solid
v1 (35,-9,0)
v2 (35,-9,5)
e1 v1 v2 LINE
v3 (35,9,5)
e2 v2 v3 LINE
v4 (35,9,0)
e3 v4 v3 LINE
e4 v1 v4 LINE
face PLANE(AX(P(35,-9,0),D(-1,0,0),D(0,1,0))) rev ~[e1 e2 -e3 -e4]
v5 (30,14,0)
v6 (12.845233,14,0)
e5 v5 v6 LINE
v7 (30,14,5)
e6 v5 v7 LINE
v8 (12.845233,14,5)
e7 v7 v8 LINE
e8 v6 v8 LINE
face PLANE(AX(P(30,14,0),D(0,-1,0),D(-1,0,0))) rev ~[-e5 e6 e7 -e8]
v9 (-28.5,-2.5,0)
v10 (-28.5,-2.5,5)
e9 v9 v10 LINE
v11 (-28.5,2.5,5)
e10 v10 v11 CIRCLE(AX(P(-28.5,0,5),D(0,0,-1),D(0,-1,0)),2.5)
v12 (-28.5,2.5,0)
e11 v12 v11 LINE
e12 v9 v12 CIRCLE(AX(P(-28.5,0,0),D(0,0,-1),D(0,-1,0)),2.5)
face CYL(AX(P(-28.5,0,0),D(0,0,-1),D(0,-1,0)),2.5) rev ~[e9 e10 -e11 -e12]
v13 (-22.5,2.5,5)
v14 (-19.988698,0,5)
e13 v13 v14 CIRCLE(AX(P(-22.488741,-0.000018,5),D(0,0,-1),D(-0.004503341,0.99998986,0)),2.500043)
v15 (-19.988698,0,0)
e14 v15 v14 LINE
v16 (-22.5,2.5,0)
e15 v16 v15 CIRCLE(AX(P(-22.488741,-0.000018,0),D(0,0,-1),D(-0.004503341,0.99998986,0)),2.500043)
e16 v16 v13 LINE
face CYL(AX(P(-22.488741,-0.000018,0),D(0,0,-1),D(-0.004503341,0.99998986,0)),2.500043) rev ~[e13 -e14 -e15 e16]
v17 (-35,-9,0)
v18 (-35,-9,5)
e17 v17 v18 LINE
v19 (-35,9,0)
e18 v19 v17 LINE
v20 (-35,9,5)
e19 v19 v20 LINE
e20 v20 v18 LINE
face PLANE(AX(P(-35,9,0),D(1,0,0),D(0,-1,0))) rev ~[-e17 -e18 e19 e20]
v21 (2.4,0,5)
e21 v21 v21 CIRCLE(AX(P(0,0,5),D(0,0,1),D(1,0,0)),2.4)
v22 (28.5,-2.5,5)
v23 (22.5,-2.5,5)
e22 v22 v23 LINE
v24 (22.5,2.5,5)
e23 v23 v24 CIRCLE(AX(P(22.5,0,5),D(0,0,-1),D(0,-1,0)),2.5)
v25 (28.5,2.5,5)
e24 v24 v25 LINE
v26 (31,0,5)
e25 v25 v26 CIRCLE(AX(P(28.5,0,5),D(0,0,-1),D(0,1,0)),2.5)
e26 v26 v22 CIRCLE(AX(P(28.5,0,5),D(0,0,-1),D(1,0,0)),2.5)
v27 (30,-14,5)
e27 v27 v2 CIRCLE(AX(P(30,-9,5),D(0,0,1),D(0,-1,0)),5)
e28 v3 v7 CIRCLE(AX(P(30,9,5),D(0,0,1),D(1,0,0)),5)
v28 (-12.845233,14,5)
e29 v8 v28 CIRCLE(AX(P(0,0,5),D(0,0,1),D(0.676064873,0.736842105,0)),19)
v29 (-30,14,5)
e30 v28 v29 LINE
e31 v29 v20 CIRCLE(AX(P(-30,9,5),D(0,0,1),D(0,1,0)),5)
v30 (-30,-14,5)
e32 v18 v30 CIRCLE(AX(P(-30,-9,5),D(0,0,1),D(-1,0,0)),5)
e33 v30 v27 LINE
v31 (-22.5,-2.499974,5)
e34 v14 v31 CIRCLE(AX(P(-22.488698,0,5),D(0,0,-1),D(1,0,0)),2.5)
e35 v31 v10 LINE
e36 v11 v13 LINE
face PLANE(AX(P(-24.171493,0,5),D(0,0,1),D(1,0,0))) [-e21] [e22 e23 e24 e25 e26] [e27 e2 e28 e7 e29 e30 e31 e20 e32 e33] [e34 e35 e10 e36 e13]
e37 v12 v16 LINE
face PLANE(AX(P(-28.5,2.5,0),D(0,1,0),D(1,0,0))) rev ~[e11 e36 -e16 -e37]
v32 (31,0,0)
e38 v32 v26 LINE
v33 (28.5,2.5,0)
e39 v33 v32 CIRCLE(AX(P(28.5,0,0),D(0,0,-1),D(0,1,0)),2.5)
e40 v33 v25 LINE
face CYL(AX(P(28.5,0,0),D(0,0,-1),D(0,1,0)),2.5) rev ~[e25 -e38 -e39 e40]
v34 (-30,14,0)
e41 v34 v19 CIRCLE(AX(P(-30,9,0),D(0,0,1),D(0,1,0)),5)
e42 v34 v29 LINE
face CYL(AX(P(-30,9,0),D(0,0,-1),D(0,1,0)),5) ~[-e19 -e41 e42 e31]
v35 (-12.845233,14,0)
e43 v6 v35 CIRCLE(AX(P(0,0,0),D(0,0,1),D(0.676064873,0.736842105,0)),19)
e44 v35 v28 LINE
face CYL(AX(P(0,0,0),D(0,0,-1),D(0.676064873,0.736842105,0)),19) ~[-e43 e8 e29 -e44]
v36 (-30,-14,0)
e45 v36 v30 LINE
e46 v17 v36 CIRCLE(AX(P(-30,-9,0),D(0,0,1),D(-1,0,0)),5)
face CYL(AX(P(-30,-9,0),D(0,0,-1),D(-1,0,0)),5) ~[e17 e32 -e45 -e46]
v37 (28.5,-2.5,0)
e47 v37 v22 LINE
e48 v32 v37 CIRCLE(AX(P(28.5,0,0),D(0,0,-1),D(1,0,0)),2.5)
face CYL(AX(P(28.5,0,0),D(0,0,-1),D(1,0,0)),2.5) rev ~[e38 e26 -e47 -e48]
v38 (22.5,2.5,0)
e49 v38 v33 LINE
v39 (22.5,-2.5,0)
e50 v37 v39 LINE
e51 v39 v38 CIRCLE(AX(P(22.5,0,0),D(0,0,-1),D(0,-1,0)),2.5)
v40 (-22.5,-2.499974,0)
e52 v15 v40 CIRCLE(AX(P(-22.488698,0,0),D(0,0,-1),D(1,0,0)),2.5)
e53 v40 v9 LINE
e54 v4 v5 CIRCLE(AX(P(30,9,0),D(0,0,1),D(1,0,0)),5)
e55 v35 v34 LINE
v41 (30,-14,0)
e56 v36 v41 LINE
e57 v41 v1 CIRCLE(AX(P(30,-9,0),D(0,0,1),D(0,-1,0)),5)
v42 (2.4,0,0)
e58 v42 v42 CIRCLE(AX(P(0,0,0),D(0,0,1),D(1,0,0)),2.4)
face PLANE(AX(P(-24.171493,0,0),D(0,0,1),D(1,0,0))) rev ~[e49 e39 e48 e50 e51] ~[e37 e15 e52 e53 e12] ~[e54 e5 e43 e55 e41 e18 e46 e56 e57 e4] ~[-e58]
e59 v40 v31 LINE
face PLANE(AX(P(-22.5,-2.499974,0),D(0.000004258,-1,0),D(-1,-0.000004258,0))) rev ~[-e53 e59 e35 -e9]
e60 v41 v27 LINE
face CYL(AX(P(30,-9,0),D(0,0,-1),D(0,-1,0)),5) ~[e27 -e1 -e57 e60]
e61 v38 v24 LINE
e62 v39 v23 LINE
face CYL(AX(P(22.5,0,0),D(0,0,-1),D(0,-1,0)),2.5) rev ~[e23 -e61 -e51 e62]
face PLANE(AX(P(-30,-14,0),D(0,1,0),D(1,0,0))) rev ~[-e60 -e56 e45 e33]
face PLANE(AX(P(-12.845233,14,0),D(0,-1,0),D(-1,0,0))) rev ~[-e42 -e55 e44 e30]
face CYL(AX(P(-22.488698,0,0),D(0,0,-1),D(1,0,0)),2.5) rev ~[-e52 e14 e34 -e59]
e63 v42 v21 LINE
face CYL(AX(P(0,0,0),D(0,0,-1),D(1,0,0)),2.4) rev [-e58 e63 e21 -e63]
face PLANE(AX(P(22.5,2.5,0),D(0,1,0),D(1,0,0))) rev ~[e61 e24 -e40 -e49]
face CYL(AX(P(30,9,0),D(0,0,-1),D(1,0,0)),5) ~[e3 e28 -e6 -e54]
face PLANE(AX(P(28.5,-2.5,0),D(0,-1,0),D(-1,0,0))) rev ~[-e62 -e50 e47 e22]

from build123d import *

# Parameters (mm, degrees)
F0_R     = 2.4
F0_W     = 18
F0_H     = 4
F1_DEPTH = 5


# Not quite as in the source:
# - ends of sketch curves that miss each other by under 0.0002 mm in the source are joined


with BuildPart() as f1:
    # F0 (on Top) → F1 (new body)
    with BuildSketch(Plane.XY):
        with BuildLine():
            Line((-12.8452325787, 14), (-30, 14))
            ThreePointArc((-30, 14), (-33.5355339059, 12.5355339059), (-35, 9))
            Line((-35, 9), (-35, -9))
            ThreePointArc((-35, -9), (-33.5355339059, -12.5355339059), (-30, -14))
            Line((-30, -14), (-12.8452325787, -14))
            ThreePointArc((-12.8452325787, -14), (-19, 0), (-12.8452325787, 14))
        make_face()
        with BuildLine():
            ThreePointArc((-28.5, -2.5), (-31, 0), (-28.5, 2.5))
            Line((-28.5, 2.5), (-22.5, 2.5))
            ThreePointArc((-22.5, 2.5), (-20.7249314431, 1.7717582393), (-19.9886980778, 0))
            ThreePointArc((-19.9886980778, 0), (-20.724931484, -1.77175828), (-22.5, -2.4999744532))
            Line((-22.5, -2.4999744532), (-28.5, -2.5))
        make_face(mode=Mode.SUBTRACT)
        with BuildLine():
            Line((12.8452325787, 14), (-12.8452325787, 14))
            ThreePointArc((-12.8452325787, 14), (-19, 0), (-12.8452325787, -14))
            add(Edge.make_bspline(
                [(-9, -10), (-10.2817441929, -11.3333333333), (-11.5634883858, -12.6666666667), (-12.8452325787, -14)],
                knots=[0, 0, 0, 0, 5.5484965156, 5.5484965156, 5.5484965156, 5.5484965156], degree=3))
            Line((-9, -10), (9, -10))
            add(Edge.make_bspline(
                [(9, -10), (10.2817441929, -11.3333333333), (11.5634883858, -12.6666666667), (12.8452325787, -14)],
                knots=[0, 0, 0, 0, 5.5484965156, 5.5484965156, 5.5484965156, 5.5484965156], degree=3))
            ThreePointArc((12.8452325787, -14), (17.393381198, -7.6465868531), (19, 0))
            ThreePointArc((19, 0), (17.393381198, 7.6465868531), (12.8452325787, 14))
        make_face()
        Circle(F0_R, mode=Mode.SUBTRACT)
        with BuildLine():
            ThreePointArc((12.8452325787, 14), (0, 19), (-12.8452325787, 14))
            Line((-12.8452325787, 14), (12.8452325787, 14))
        make_face()
        with BuildLine():
            Line((30, 14), (12.8452325787, 14))
            ThreePointArc((12.8452325787, 14), (17.393381198, 7.6465868531), (19, 0))
            ThreePointArc((19, 0), (17.393381198, -7.6465868531), (12.8452325787, -14))
            Line((12.8452325787, -14), (30, -14))
            ThreePointArc((30, -14), (33.5355339059, -12.5355339059), (35, -9))
            Line((35, -9), (35, 9))
            ThreePointArc((35, 9), (33.5355339059, 12.5355339059), (30, 14))
        make_face()
        with BuildLine():
            ThreePointArc((22.5, -2.5), (20, 0), (22.5, 2.5))
            Line((22.5, 2.5), (28.5, 2.5))
            ThreePointArc((28.5, 2.5), (30.267766953, 1.767766953), (31, 0))
            ThreePointArc((31, 0), (30.267766953, -1.767766953), (28.5, -2.5))
            Line((28.5, -2.5), (22.5, -2.5))
        make_face(mode=Mode.SUBTRACT)
        with Locations((0, -12)):
            Rectangle(F0_W, F0_H)
        with BuildLine():
            add(Edge.make_bspline(
                [(-9, -10), (-10.2817441929, -11.3333333333), (-11.5634883858, -12.6666666667), (-12.8452325787, -14)],
                knots=[0, 0, 0, 0, 5.5484965156, 5.5484965156, 5.5484965156, 5.5484965156], degree=3))
            Line((-12.8452325787, -14), (-9, -14))
            Line((-9, -14), (-9, -10))
        make_face()
        with BuildLine():
            Line((9, -14), (12.8452325787, -14))
            add(Edge.make_bspline(
                [(9, -10), (10.2817441929, -11.3333333333), (11.5634883858, -12.6666666667), (12.8452325787, -14)],
                knots=[0, 0, 0, 0, 5.5484965156, 5.5484965156, 5.5484965156, 5.5484965156], degree=3))
            Line((9, -10), (9, -14))
        make_face()
    extrude(amount=F1_DEPTH)


solid = f1.part
